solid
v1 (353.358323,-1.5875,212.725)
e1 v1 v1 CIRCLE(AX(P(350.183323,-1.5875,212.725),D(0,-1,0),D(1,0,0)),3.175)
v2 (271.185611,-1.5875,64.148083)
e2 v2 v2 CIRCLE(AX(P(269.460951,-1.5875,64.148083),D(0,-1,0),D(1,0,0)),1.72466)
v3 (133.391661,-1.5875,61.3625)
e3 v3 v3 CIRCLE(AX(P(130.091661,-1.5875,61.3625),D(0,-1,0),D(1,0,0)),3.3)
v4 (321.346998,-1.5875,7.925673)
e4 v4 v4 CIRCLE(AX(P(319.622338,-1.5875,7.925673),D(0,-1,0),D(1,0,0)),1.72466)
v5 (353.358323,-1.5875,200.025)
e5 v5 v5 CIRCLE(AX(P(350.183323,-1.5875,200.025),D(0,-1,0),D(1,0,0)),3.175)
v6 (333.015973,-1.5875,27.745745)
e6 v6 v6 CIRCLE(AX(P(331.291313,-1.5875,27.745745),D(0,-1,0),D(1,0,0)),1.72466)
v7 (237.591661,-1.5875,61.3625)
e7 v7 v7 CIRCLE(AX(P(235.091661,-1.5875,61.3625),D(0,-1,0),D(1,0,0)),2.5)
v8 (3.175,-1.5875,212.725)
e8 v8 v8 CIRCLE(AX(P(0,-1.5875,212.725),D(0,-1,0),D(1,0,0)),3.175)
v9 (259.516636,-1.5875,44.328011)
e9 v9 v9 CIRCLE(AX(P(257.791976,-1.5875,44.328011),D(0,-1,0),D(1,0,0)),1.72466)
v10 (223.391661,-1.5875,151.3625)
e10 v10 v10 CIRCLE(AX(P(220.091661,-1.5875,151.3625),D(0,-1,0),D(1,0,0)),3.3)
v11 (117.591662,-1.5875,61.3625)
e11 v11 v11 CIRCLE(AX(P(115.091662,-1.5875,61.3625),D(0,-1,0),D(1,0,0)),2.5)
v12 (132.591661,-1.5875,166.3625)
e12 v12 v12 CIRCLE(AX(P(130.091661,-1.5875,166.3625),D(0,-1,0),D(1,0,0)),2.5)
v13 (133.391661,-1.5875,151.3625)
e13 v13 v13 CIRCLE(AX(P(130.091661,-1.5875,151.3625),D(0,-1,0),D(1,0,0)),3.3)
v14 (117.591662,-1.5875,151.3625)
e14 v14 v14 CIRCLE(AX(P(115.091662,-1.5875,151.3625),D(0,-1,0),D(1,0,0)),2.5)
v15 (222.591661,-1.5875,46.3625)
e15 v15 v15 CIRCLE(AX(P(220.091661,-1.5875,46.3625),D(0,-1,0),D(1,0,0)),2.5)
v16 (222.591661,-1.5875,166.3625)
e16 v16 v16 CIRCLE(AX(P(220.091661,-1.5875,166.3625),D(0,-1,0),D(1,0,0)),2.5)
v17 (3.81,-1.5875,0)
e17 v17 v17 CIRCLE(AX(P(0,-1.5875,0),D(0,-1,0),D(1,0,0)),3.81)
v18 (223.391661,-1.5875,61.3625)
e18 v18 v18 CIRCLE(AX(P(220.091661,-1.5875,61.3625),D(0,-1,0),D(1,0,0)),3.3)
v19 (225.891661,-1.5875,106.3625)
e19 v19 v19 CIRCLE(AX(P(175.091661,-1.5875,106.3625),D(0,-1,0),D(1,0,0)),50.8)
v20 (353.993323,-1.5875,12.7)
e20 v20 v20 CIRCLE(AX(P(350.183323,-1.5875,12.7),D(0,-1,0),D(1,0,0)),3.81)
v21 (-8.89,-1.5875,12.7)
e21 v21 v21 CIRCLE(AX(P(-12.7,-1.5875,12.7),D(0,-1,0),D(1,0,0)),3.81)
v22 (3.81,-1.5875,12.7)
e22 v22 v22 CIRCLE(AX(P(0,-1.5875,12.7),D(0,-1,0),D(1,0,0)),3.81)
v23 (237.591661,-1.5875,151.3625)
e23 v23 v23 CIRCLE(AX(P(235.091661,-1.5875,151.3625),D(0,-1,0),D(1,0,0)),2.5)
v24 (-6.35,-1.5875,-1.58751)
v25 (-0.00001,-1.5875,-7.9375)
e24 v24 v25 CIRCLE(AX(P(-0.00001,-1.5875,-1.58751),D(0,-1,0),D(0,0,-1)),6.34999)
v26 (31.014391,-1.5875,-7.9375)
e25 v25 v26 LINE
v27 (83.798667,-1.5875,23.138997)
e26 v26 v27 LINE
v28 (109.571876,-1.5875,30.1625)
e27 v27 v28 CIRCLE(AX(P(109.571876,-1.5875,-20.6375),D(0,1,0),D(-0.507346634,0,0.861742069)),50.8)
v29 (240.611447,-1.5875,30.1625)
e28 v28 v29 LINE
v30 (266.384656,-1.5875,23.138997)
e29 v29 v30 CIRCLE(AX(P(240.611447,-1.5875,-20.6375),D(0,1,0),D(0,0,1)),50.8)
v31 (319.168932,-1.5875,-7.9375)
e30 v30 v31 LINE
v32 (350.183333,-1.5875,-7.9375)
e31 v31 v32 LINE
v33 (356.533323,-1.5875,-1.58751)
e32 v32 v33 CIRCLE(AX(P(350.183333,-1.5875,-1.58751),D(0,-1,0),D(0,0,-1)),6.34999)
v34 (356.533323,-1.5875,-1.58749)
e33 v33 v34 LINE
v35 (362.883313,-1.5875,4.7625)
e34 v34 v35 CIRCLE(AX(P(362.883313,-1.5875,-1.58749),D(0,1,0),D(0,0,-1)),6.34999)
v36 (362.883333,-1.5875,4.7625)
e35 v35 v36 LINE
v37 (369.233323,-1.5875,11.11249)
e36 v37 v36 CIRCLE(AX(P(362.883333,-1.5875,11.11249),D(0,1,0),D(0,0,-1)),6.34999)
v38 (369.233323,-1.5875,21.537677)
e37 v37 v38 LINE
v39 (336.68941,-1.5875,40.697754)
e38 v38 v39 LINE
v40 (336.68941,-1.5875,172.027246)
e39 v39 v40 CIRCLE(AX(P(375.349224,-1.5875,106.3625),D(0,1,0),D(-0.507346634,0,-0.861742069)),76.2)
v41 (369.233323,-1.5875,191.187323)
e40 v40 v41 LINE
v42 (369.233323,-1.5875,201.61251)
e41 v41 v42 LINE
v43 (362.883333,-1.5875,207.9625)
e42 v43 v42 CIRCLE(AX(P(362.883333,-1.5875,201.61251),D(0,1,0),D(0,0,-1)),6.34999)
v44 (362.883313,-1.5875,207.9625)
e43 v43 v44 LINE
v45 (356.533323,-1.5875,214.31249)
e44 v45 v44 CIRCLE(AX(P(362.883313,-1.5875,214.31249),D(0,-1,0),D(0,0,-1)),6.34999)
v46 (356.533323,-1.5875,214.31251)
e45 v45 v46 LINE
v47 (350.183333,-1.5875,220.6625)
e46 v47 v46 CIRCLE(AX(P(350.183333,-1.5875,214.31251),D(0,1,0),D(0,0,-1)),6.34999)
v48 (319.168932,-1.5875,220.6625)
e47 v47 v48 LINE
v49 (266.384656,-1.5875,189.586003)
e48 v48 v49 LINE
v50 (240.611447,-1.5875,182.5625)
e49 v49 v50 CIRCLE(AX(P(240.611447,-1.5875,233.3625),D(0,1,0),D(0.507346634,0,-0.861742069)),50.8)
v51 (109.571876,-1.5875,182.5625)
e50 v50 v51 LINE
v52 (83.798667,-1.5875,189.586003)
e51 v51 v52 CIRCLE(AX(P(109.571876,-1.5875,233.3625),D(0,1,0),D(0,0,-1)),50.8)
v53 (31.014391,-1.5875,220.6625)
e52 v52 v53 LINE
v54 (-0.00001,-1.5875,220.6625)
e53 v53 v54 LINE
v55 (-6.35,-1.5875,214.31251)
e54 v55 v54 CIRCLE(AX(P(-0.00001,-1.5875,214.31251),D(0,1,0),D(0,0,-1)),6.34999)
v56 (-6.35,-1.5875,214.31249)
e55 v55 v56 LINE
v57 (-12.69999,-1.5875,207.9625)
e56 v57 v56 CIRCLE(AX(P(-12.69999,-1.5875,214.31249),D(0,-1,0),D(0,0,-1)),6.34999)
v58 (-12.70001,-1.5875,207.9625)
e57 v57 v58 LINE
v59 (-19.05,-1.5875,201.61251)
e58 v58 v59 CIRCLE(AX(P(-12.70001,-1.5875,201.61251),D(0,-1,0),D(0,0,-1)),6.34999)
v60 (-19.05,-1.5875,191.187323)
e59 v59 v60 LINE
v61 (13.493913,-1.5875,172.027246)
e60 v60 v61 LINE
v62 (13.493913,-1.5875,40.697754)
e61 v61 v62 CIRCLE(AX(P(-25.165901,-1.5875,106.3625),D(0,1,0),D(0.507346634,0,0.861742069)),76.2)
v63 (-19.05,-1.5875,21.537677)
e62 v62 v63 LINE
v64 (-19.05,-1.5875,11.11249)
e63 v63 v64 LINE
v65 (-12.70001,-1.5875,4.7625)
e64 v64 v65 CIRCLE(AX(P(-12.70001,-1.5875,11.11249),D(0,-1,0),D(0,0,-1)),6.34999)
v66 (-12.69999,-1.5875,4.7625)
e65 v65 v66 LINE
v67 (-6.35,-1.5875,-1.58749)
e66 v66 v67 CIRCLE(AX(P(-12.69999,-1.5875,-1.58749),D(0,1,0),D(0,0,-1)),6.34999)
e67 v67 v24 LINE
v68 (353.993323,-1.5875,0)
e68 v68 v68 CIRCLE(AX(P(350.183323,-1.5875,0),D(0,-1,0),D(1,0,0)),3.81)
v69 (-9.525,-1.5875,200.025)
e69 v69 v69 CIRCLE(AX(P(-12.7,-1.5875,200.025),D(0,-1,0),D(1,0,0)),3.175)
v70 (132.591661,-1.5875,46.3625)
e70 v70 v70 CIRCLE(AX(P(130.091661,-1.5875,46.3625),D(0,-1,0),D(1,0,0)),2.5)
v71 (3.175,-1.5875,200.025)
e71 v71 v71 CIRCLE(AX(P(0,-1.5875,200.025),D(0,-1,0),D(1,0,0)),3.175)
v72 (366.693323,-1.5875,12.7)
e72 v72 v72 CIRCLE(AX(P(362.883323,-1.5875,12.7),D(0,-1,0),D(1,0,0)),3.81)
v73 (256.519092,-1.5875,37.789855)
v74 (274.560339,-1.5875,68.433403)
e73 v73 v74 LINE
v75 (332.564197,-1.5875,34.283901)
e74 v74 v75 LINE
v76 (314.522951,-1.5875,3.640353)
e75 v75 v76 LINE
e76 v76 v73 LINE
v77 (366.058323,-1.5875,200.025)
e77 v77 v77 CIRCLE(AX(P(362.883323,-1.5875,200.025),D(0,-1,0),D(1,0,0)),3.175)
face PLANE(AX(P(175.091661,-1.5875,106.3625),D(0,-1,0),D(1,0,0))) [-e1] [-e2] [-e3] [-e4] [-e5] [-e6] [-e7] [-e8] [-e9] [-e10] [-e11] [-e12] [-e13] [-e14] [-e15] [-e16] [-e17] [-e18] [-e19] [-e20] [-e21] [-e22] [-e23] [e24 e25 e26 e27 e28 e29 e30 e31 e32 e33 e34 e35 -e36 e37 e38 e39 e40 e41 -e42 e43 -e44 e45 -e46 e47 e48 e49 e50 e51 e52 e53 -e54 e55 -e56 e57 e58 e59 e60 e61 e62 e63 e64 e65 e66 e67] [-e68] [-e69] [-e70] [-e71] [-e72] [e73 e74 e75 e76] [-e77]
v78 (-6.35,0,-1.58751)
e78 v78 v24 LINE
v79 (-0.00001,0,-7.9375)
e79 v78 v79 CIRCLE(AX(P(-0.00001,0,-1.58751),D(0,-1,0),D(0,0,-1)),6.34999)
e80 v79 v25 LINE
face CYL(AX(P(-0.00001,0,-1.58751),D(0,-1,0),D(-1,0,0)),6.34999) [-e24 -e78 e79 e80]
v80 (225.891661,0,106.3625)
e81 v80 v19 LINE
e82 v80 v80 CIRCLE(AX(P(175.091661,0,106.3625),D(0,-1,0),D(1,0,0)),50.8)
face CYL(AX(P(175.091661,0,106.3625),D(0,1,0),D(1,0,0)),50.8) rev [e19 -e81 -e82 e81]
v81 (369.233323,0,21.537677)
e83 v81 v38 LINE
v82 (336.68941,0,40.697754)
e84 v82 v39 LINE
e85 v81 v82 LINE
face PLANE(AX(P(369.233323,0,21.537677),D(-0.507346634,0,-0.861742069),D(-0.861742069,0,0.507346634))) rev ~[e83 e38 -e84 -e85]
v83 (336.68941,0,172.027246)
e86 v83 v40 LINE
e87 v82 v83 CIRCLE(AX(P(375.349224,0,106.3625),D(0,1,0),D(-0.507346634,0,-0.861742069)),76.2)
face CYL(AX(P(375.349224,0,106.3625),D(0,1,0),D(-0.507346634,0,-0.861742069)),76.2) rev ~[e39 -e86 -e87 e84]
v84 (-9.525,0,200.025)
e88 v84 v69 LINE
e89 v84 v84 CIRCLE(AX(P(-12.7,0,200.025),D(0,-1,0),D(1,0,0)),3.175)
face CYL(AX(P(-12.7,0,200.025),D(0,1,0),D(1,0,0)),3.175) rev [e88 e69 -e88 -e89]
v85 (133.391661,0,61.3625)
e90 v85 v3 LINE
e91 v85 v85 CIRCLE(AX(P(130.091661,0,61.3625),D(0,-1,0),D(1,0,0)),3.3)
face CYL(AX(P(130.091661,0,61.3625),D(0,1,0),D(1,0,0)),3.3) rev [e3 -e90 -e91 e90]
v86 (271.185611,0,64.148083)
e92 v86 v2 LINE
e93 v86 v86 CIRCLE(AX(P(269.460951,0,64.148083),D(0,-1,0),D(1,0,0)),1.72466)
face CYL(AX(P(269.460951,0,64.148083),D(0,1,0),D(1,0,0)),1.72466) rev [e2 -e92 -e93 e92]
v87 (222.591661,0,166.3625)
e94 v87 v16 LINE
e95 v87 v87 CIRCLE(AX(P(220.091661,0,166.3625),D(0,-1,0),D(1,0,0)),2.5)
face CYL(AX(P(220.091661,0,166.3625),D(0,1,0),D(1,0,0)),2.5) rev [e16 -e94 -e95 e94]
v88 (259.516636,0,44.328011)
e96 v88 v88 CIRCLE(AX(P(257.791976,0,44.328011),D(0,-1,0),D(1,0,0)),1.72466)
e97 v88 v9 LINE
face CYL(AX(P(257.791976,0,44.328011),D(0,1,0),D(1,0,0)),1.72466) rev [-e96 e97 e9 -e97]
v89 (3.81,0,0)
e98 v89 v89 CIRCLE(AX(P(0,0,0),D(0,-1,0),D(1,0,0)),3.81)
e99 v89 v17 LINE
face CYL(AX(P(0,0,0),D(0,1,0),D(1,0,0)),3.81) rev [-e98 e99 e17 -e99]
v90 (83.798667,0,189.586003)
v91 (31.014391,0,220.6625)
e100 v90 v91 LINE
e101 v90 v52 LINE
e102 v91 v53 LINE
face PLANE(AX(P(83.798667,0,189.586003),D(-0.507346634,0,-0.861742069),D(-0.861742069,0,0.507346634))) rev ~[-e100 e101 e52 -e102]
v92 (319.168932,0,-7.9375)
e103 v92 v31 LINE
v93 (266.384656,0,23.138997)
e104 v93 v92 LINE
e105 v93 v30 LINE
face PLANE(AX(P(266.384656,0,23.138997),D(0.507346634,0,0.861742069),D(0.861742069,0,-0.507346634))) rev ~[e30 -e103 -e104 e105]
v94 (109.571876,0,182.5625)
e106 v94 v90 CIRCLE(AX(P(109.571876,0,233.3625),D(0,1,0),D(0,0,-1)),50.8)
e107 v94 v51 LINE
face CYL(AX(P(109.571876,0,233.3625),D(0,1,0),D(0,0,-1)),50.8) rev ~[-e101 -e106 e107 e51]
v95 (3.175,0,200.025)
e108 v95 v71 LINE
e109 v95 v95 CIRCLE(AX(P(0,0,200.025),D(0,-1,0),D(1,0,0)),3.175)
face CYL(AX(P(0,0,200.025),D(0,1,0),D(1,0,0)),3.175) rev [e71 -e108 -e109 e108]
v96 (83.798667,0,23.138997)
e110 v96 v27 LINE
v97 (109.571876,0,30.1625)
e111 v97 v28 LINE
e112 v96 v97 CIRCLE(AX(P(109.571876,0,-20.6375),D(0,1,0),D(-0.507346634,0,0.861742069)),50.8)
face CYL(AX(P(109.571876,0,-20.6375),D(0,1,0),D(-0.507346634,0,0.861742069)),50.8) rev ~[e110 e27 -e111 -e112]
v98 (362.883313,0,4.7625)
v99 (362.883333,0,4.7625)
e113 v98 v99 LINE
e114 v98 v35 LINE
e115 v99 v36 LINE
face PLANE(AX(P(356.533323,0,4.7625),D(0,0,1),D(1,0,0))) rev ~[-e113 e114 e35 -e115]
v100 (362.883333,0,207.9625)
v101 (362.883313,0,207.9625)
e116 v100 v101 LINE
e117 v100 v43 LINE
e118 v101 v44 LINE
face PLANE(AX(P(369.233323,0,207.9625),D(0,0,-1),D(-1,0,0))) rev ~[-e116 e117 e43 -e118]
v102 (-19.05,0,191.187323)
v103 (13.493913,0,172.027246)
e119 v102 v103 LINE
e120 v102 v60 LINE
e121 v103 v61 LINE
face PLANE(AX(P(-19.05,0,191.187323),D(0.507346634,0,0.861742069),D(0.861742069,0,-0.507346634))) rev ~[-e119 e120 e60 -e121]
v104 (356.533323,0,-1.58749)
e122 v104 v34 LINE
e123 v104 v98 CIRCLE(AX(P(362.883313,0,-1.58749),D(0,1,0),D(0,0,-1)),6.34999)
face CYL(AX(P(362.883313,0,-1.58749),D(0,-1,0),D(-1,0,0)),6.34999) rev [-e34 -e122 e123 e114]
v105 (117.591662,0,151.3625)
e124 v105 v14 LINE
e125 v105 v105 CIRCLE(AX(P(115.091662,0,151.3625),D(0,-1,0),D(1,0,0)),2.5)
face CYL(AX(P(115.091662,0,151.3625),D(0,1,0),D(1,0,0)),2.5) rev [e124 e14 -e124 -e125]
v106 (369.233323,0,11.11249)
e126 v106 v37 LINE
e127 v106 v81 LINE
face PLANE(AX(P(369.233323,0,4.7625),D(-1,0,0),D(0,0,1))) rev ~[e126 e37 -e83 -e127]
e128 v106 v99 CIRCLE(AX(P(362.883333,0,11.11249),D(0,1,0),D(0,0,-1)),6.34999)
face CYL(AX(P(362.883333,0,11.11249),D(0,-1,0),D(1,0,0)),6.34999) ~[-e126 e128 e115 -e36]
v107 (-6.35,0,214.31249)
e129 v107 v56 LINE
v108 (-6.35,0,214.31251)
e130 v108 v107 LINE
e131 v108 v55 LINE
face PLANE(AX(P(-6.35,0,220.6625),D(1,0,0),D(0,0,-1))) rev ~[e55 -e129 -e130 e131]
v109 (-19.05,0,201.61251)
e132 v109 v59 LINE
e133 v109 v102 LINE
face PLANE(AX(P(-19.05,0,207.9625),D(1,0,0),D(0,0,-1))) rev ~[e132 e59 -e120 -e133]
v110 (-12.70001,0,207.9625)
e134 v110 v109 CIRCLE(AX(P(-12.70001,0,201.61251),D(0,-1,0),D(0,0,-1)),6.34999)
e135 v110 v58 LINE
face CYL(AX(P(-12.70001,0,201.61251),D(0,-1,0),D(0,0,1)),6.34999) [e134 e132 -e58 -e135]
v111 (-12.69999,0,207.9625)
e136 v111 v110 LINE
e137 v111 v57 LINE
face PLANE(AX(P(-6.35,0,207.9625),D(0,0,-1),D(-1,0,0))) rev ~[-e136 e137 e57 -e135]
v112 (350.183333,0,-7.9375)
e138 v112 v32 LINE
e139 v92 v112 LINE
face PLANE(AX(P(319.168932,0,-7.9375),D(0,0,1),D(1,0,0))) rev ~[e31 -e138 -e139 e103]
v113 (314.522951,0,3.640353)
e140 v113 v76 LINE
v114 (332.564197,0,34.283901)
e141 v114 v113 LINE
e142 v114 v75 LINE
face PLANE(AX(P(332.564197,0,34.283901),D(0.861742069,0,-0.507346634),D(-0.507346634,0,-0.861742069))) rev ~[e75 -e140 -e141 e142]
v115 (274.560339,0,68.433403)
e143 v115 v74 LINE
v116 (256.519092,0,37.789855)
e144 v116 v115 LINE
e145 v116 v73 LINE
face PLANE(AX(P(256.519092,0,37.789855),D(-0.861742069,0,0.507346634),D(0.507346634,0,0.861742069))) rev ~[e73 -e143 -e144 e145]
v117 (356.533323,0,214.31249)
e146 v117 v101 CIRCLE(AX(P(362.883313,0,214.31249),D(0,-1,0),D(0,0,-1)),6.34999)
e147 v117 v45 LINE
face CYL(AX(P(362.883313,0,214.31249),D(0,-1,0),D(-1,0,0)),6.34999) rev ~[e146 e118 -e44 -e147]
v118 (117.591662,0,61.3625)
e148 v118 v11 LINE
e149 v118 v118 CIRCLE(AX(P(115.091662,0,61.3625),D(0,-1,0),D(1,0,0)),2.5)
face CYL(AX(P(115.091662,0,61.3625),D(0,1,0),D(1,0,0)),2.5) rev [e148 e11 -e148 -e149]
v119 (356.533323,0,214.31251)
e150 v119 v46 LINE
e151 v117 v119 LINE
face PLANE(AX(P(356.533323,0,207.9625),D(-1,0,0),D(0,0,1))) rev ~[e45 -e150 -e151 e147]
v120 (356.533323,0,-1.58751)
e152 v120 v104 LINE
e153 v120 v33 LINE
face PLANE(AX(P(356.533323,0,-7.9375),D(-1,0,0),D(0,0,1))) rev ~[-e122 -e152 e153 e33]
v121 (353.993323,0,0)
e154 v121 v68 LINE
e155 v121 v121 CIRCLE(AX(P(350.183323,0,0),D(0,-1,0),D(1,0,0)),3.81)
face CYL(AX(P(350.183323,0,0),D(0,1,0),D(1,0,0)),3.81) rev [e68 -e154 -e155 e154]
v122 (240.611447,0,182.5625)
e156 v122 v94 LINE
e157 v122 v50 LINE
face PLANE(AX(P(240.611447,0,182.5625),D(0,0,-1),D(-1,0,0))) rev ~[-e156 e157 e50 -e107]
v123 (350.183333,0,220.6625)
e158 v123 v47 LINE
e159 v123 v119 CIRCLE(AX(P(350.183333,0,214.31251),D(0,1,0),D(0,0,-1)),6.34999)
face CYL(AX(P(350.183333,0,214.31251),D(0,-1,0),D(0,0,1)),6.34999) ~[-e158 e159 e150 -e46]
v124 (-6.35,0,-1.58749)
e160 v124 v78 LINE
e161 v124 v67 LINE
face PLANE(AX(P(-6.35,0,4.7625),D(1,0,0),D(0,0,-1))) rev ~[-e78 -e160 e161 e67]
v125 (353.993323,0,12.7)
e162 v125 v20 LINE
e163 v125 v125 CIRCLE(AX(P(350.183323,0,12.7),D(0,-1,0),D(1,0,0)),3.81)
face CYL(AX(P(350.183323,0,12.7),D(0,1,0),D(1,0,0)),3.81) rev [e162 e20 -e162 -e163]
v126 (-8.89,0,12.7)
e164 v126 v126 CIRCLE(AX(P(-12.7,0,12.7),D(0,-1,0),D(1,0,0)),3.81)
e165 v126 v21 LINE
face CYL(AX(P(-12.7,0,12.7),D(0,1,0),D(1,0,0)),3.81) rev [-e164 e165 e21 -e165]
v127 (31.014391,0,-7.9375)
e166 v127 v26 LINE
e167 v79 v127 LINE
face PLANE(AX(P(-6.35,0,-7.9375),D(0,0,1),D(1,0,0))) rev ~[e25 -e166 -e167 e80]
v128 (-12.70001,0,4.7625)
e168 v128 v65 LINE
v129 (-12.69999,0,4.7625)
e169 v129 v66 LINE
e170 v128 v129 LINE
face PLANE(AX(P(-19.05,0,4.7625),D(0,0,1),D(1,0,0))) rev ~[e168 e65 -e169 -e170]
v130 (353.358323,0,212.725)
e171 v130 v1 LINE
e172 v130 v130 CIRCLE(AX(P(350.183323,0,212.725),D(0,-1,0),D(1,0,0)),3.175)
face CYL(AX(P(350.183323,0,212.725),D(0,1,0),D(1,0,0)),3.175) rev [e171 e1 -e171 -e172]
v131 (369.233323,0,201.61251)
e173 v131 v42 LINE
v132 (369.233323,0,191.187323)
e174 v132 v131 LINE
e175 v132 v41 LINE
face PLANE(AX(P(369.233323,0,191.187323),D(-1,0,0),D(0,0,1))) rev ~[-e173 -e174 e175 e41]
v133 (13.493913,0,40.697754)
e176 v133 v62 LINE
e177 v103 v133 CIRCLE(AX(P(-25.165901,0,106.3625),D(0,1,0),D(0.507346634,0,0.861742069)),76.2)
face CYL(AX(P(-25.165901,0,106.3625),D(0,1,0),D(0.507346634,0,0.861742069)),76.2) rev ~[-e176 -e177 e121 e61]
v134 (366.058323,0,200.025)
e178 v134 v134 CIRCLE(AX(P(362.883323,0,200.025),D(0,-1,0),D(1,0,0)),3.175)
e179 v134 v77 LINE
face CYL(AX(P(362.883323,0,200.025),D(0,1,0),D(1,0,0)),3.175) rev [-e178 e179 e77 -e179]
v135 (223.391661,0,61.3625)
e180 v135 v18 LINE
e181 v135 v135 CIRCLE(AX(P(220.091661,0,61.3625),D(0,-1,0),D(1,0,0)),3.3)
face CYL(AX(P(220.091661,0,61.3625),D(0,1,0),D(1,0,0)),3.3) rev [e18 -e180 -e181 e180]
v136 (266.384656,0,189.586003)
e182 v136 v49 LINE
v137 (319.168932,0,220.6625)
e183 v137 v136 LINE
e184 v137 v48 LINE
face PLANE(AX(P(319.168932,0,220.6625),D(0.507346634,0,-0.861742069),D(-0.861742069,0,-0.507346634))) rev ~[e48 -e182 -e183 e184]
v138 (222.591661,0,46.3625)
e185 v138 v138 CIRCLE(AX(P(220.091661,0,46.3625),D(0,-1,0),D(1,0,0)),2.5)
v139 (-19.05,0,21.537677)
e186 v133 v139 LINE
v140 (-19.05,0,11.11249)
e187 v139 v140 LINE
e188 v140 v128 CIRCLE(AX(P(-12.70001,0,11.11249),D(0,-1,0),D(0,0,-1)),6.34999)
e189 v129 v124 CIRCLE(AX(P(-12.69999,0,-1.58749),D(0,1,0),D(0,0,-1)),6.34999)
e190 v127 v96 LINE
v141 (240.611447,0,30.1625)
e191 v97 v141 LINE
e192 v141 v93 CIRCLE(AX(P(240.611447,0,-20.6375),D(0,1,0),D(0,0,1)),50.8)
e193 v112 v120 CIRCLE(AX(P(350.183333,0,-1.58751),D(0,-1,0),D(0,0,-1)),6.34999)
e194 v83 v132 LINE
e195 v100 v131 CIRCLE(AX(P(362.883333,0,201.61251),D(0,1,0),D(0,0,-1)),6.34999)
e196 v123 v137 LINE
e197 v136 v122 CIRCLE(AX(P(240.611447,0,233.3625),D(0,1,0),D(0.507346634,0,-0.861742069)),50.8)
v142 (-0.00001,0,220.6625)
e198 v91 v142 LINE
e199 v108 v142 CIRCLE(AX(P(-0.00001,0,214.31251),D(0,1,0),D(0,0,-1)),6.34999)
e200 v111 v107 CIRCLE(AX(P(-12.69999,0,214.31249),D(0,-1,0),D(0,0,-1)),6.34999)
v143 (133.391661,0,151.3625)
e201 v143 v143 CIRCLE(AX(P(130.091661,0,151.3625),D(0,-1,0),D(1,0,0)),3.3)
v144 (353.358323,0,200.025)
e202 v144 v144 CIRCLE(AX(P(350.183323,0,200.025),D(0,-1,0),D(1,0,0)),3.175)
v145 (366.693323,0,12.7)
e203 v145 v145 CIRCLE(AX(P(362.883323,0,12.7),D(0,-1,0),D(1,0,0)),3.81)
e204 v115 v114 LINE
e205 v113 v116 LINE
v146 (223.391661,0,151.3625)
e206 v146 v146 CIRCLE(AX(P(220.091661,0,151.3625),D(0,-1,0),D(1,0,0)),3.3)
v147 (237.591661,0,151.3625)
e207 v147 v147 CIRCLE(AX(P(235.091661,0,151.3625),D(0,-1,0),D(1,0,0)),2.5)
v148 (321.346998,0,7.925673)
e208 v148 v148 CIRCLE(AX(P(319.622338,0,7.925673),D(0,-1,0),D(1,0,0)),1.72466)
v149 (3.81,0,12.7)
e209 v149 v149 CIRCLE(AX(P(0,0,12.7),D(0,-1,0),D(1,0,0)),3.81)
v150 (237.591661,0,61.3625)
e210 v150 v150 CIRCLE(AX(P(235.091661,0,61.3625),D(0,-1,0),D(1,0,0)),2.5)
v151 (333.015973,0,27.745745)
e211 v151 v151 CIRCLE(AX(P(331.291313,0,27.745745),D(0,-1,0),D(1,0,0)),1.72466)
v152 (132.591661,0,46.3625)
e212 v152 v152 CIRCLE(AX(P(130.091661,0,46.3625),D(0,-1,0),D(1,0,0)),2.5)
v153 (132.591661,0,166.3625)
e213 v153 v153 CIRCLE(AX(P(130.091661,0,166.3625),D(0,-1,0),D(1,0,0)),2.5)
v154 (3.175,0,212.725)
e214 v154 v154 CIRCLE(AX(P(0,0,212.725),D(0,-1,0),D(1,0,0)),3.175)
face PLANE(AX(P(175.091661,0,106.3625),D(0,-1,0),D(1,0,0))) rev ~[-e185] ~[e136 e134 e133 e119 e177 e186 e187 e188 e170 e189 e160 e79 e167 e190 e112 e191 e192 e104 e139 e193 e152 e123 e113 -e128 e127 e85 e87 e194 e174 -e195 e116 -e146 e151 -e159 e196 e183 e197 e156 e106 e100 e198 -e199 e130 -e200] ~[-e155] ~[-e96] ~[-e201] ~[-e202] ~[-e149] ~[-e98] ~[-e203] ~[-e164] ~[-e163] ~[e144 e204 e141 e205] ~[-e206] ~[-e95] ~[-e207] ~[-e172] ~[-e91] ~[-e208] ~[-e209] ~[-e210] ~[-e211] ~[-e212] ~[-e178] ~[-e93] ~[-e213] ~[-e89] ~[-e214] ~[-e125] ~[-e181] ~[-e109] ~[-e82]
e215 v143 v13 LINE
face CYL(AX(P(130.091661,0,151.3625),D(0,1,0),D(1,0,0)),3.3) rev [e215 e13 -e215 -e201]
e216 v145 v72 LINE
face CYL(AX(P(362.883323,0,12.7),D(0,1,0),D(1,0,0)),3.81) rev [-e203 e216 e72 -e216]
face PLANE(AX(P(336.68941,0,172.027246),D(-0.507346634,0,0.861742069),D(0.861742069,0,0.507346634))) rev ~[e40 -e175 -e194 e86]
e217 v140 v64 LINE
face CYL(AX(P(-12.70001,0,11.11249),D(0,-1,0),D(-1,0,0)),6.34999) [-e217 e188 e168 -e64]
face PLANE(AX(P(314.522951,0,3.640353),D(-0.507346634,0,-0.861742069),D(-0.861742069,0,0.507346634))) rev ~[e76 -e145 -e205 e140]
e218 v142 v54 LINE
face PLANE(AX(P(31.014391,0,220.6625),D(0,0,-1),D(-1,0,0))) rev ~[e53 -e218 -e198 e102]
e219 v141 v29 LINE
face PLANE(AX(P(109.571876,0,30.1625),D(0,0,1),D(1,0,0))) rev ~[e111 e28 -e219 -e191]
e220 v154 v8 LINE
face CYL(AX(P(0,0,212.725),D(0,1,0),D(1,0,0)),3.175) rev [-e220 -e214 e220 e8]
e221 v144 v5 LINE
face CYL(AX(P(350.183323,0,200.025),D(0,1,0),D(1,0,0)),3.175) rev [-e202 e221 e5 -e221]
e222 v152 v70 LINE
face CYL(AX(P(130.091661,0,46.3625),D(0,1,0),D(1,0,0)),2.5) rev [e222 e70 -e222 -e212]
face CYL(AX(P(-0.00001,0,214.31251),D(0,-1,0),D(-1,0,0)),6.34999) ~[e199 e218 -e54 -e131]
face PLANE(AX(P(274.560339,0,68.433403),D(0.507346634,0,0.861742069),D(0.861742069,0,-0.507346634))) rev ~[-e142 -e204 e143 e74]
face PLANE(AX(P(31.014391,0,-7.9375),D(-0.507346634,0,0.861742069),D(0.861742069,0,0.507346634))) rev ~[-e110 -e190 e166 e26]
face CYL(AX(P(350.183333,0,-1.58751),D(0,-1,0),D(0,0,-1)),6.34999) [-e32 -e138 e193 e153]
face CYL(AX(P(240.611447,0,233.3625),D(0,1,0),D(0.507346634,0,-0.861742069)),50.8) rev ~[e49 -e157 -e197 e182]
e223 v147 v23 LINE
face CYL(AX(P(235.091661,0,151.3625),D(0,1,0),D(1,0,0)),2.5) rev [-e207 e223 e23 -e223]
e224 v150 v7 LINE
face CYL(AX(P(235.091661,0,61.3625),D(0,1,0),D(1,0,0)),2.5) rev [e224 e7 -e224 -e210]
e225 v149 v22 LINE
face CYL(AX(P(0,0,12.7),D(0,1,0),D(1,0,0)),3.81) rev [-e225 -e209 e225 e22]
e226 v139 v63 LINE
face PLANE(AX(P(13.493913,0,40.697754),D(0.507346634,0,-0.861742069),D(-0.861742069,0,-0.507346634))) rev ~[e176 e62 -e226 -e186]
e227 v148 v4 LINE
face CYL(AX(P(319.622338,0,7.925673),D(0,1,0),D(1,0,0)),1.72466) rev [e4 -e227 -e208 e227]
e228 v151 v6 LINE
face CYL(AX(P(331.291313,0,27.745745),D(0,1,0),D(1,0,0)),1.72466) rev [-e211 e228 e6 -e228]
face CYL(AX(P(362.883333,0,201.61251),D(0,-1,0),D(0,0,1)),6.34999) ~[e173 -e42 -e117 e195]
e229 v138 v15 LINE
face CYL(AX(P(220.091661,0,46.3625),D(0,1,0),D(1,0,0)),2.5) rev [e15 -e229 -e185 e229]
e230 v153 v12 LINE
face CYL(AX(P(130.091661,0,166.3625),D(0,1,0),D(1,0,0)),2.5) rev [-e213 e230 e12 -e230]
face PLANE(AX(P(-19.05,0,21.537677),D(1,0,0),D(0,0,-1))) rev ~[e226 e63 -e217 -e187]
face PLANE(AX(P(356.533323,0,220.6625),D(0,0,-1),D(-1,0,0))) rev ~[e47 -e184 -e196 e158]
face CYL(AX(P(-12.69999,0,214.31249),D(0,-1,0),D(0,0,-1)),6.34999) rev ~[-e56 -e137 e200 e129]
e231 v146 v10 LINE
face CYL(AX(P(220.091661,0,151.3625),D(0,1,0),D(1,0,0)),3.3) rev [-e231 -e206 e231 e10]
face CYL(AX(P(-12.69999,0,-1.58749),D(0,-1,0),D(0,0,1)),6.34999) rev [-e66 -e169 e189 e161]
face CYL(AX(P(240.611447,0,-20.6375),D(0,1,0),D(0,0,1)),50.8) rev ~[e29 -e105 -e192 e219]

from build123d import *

# Parameters (mm, degrees)
F0_R     = 3.81
F0_R_2   = 2.5
F0_R_3   = 3.3
F0_R_4   = 1.72466
F0_R_5   = 3.175
F0_R_6   = 50.8
F1_DEPTH = 1.5875
F2_R     = 6.34999


# Not quite as in the source:
# - a fillet or chamfer is up to 0.001 mm smaller than in the source, because OpenCascade refuses the exact size


with BuildPart() as f1:
    # F0 (on Front) → F1 (new body)
    with BuildSketch(Plane.XZ):
        with BuildLine():
            Line((-6.35, 207.9625), (-19.05, 207.9625))
            Line((-19.05, 207.9625), (-19.05, 191.187323006))
            Line((-19.05, 191.187323006), (13.4939129862, 172.0272456399))
            ThreePointArc((13.4939129862, 172.0272456399), (51.0340994838, 106.3625), (13.4939129862, 40.6977543601))
            Line((13.4939129862, 40.6977543601), (-19.05, 21.537676994))
            Line((-19.05, 21.537676994), (-19.05, 4.7625))
            Line((-19.05, 4.7625), (-6.35, 4.7625))
            Line((-6.35, 4.7625), (-6.35, -7.9375))
            Line((-6.35, -7.9375), (31.0143905041, -7.9375))
            Line((31.0143905041, -7.9375), (83.7986667883, 23.1389970933))
            ThreePointArc((83.7986667883, 23.1389970933), (96.215342788, 28.3751822993), (109.5718757899, 30.1625))
            Line((109.5718757899, 30.1625), (240.6114472101, 30.1625))
            ThreePointArc((240.6114472101, 30.1625), (253.967980212, 28.3751822993), (266.3846562117, 23.1389970933))
            Line((266.3846562117, 23.1389970933), (319.1689324959, -7.9375))
            Line((319.1689324959, -7.9375), (356.533323, -7.9375))
            Line((356.533323, -7.9375), (356.533323, 4.7625))
            Line((356.533323, 4.7625), (369.233323, 4.7625))
            Line((369.233323, 4.7625), (369.233323, 21.537676994))
            Line((369.233323, 21.537676994), (336.6894100138, 40.6977543601))
            ThreePointArc((336.6894100138, 40.6977543601), (299.1492235162, 106.3625), (336.6894100138, 172.0272456399))
            Line((336.6894100138, 172.0272456399), (369.233323, 191.187323006))
            Line((369.233323, 191.187323006), (369.233323, 207.9625))
            Line((369.233323, 207.9625), (356.533323, 207.9625))
            Line((356.533323, 207.9625), (356.533323, 220.6625))
            Line((356.533323, 220.6625), (319.1689324959, 220.6625))
            Line((319.1689324959, 220.6625), (266.3846562117, 189.5860029067))
            ThreePointArc((266.3846562117, 189.5860029067), (253.967980212, 184.3498177007), (240.6114472101, 182.5625))
            Line((240.6114472101, 182.5625), (109.5718757899, 182.5625))
            ThreePointArc((109.5718757899, 182.5625), (96.215342788, 184.3498177007), (83.7986667883, 189.5860029067))
            Line((83.7986667883, 189.5860029067), (31.0143905041, 220.6625))
            Line((31.0143905041, 220.6625), (-6.35, 220.6625))
            Line((-6.35, 220.6625), (-6.35, 207.9625))
        make_face()
        Circle(F0_R, mode=Mode.SUBTRACT)
        with Locations((-12.7, 12.7)):
            Circle(F0_R, mode=Mode.SUBTRACT)
        with Locations((0, 12.7)):
            Circle(F0_R, mode=Mode.SUBTRACT)
        with Locations((130.0916615, 46.3625)):
            Circle(F0_R_2, mode=Mode.SUBTRACT)
        with Locations((115.0916615, 61.3625)):
            Circle(F0_R_2, mode=Mode.SUBTRACT)
        with Locations((130.0916615, 61.3625)):
            Circle(F0_R_3, mode=Mode.SUBTRACT)
        with Locations((220.0916615, 46.3625)):
            Circle(F0_R_2, mode=Mode.SUBTRACT)
        with Locations((257.7919761398, 44.3280112686)):
            Circle(F0_R_4, mode=Mode.SUBTRACT)
        with Locations((319.6223383993, 7.9256731426)):
            Circle(F0_R_4, mode=Mode.SUBTRACT)
        with Locations((350.183323, 0)):
            Circle(F0_R, mode=Mode.SUBTRACT)
        with Locations((350.183323, 12.7)):
            Circle(F0_R, mode=Mode.SUBTRACT)
        with Locations((362.883323, 12.7)):
            Circle(F0_R, mode=Mode.SUBTRACT)
        Polygon((314.5229509507, 3.6403531184), (256.5190923021, 37.7898550455), (274.5603386032, 68.4334030108), (332.5641972518, 34.2839010837), align=None, mode=Mode.SUBTRACT)
        with Locations((331.2913134141, 27.7457448606)):
            Circle(F0_R_4, mode=Mode.SUBTRACT)
        with Locations((220.0916615, 61.3625)):
            Circle(F0_R_3, mode=Mode.SUBTRACT)
        with Locations((235.0916615, 61.3625)):
            Circle(F0_R_2, mode=Mode.SUBTRACT)
        with Locations((269.4609511546, 64.1480829866)):
            Circle(F0_R_4, mode=Mode.SUBTRACT)
        with Locations((115.0916615, 151.3625)):
            Circle(F0_R_2, mode=Mode.SUBTRACT)
        with Locations((130.0916615, 151.3625)):
            Circle(F0_R_3, mode=Mode.SUBTRACT)
        with Locations((-12.7, 200.025)):
            Circle(F0_R_5, mode=Mode.SUBTRACT)
        with Locations((0, 200.025)):
            Circle(F0_R_5, mode=Mode.SUBTRACT)
        with Locations((0, 212.725)):
            Circle(F0_R_5, mode=Mode.SUBTRACT)
        with Locations((130.0916615, 166.3625)):
            Circle(F0_R_2, mode=Mode.SUBTRACT)
        with Locations((175.0916615, 106.3625)):
            Circle(F0_R_6, mode=Mode.SUBTRACT)
        with Locations((220.0916615, 151.3625)):
            Circle(F0_R_3, mode=Mode.SUBTRACT)
        with Locations((235.0916615, 151.3625)):
            Circle(F0_R_2, mode=Mode.SUBTRACT)
        with Locations((220.0916615, 166.3625)):
            Circle(F0_R_2, mode=Mode.SUBTRACT)
        with Locations((350.183323, 200.025)):
            Circle(F0_R_5, mode=Mode.SUBTRACT)
        with Locations((362.883323, 200.025)):
            Circle(F0_R_5, mode=Mode.SUBTRACT)
        with Locations((350.183323, 212.725)):
            Circle(F0_R_5, mode=Mode.SUBTRACT)
    extrude(amount=F1_DEPTH)

    # F2 (radius 6.35 in the source; OpenCascade refuses exactly that, so slightly less here)
    f2_edges = [f1.edges().sort_by_distance(p)[0] for p in [
        (-6.35, -0.79375, 207.9625),
        (-6.35, -0.79375, 220.6625),
        (-19.05, -0.79375, 207.9625),
        (356.533323, -0.79375, 207.9625),
        (356.533323, -0.79375, 220.6625),
        (369.233323, -0.79375, 207.9625),
        (356.533323, -0.79375, 4.7625),
        (369.233323, -0.79375, 4.7625),
        (356.533323, -0.79375, -7.9375),
        (-6.35, -0.79375, 4.7625),
        (-19.05, -0.79375, 4.7625),
        (-6.35, -0.79375, -7.9375),
    ]]
    fillet(f2_edges, radius=F2_R)


solid = f1.part
